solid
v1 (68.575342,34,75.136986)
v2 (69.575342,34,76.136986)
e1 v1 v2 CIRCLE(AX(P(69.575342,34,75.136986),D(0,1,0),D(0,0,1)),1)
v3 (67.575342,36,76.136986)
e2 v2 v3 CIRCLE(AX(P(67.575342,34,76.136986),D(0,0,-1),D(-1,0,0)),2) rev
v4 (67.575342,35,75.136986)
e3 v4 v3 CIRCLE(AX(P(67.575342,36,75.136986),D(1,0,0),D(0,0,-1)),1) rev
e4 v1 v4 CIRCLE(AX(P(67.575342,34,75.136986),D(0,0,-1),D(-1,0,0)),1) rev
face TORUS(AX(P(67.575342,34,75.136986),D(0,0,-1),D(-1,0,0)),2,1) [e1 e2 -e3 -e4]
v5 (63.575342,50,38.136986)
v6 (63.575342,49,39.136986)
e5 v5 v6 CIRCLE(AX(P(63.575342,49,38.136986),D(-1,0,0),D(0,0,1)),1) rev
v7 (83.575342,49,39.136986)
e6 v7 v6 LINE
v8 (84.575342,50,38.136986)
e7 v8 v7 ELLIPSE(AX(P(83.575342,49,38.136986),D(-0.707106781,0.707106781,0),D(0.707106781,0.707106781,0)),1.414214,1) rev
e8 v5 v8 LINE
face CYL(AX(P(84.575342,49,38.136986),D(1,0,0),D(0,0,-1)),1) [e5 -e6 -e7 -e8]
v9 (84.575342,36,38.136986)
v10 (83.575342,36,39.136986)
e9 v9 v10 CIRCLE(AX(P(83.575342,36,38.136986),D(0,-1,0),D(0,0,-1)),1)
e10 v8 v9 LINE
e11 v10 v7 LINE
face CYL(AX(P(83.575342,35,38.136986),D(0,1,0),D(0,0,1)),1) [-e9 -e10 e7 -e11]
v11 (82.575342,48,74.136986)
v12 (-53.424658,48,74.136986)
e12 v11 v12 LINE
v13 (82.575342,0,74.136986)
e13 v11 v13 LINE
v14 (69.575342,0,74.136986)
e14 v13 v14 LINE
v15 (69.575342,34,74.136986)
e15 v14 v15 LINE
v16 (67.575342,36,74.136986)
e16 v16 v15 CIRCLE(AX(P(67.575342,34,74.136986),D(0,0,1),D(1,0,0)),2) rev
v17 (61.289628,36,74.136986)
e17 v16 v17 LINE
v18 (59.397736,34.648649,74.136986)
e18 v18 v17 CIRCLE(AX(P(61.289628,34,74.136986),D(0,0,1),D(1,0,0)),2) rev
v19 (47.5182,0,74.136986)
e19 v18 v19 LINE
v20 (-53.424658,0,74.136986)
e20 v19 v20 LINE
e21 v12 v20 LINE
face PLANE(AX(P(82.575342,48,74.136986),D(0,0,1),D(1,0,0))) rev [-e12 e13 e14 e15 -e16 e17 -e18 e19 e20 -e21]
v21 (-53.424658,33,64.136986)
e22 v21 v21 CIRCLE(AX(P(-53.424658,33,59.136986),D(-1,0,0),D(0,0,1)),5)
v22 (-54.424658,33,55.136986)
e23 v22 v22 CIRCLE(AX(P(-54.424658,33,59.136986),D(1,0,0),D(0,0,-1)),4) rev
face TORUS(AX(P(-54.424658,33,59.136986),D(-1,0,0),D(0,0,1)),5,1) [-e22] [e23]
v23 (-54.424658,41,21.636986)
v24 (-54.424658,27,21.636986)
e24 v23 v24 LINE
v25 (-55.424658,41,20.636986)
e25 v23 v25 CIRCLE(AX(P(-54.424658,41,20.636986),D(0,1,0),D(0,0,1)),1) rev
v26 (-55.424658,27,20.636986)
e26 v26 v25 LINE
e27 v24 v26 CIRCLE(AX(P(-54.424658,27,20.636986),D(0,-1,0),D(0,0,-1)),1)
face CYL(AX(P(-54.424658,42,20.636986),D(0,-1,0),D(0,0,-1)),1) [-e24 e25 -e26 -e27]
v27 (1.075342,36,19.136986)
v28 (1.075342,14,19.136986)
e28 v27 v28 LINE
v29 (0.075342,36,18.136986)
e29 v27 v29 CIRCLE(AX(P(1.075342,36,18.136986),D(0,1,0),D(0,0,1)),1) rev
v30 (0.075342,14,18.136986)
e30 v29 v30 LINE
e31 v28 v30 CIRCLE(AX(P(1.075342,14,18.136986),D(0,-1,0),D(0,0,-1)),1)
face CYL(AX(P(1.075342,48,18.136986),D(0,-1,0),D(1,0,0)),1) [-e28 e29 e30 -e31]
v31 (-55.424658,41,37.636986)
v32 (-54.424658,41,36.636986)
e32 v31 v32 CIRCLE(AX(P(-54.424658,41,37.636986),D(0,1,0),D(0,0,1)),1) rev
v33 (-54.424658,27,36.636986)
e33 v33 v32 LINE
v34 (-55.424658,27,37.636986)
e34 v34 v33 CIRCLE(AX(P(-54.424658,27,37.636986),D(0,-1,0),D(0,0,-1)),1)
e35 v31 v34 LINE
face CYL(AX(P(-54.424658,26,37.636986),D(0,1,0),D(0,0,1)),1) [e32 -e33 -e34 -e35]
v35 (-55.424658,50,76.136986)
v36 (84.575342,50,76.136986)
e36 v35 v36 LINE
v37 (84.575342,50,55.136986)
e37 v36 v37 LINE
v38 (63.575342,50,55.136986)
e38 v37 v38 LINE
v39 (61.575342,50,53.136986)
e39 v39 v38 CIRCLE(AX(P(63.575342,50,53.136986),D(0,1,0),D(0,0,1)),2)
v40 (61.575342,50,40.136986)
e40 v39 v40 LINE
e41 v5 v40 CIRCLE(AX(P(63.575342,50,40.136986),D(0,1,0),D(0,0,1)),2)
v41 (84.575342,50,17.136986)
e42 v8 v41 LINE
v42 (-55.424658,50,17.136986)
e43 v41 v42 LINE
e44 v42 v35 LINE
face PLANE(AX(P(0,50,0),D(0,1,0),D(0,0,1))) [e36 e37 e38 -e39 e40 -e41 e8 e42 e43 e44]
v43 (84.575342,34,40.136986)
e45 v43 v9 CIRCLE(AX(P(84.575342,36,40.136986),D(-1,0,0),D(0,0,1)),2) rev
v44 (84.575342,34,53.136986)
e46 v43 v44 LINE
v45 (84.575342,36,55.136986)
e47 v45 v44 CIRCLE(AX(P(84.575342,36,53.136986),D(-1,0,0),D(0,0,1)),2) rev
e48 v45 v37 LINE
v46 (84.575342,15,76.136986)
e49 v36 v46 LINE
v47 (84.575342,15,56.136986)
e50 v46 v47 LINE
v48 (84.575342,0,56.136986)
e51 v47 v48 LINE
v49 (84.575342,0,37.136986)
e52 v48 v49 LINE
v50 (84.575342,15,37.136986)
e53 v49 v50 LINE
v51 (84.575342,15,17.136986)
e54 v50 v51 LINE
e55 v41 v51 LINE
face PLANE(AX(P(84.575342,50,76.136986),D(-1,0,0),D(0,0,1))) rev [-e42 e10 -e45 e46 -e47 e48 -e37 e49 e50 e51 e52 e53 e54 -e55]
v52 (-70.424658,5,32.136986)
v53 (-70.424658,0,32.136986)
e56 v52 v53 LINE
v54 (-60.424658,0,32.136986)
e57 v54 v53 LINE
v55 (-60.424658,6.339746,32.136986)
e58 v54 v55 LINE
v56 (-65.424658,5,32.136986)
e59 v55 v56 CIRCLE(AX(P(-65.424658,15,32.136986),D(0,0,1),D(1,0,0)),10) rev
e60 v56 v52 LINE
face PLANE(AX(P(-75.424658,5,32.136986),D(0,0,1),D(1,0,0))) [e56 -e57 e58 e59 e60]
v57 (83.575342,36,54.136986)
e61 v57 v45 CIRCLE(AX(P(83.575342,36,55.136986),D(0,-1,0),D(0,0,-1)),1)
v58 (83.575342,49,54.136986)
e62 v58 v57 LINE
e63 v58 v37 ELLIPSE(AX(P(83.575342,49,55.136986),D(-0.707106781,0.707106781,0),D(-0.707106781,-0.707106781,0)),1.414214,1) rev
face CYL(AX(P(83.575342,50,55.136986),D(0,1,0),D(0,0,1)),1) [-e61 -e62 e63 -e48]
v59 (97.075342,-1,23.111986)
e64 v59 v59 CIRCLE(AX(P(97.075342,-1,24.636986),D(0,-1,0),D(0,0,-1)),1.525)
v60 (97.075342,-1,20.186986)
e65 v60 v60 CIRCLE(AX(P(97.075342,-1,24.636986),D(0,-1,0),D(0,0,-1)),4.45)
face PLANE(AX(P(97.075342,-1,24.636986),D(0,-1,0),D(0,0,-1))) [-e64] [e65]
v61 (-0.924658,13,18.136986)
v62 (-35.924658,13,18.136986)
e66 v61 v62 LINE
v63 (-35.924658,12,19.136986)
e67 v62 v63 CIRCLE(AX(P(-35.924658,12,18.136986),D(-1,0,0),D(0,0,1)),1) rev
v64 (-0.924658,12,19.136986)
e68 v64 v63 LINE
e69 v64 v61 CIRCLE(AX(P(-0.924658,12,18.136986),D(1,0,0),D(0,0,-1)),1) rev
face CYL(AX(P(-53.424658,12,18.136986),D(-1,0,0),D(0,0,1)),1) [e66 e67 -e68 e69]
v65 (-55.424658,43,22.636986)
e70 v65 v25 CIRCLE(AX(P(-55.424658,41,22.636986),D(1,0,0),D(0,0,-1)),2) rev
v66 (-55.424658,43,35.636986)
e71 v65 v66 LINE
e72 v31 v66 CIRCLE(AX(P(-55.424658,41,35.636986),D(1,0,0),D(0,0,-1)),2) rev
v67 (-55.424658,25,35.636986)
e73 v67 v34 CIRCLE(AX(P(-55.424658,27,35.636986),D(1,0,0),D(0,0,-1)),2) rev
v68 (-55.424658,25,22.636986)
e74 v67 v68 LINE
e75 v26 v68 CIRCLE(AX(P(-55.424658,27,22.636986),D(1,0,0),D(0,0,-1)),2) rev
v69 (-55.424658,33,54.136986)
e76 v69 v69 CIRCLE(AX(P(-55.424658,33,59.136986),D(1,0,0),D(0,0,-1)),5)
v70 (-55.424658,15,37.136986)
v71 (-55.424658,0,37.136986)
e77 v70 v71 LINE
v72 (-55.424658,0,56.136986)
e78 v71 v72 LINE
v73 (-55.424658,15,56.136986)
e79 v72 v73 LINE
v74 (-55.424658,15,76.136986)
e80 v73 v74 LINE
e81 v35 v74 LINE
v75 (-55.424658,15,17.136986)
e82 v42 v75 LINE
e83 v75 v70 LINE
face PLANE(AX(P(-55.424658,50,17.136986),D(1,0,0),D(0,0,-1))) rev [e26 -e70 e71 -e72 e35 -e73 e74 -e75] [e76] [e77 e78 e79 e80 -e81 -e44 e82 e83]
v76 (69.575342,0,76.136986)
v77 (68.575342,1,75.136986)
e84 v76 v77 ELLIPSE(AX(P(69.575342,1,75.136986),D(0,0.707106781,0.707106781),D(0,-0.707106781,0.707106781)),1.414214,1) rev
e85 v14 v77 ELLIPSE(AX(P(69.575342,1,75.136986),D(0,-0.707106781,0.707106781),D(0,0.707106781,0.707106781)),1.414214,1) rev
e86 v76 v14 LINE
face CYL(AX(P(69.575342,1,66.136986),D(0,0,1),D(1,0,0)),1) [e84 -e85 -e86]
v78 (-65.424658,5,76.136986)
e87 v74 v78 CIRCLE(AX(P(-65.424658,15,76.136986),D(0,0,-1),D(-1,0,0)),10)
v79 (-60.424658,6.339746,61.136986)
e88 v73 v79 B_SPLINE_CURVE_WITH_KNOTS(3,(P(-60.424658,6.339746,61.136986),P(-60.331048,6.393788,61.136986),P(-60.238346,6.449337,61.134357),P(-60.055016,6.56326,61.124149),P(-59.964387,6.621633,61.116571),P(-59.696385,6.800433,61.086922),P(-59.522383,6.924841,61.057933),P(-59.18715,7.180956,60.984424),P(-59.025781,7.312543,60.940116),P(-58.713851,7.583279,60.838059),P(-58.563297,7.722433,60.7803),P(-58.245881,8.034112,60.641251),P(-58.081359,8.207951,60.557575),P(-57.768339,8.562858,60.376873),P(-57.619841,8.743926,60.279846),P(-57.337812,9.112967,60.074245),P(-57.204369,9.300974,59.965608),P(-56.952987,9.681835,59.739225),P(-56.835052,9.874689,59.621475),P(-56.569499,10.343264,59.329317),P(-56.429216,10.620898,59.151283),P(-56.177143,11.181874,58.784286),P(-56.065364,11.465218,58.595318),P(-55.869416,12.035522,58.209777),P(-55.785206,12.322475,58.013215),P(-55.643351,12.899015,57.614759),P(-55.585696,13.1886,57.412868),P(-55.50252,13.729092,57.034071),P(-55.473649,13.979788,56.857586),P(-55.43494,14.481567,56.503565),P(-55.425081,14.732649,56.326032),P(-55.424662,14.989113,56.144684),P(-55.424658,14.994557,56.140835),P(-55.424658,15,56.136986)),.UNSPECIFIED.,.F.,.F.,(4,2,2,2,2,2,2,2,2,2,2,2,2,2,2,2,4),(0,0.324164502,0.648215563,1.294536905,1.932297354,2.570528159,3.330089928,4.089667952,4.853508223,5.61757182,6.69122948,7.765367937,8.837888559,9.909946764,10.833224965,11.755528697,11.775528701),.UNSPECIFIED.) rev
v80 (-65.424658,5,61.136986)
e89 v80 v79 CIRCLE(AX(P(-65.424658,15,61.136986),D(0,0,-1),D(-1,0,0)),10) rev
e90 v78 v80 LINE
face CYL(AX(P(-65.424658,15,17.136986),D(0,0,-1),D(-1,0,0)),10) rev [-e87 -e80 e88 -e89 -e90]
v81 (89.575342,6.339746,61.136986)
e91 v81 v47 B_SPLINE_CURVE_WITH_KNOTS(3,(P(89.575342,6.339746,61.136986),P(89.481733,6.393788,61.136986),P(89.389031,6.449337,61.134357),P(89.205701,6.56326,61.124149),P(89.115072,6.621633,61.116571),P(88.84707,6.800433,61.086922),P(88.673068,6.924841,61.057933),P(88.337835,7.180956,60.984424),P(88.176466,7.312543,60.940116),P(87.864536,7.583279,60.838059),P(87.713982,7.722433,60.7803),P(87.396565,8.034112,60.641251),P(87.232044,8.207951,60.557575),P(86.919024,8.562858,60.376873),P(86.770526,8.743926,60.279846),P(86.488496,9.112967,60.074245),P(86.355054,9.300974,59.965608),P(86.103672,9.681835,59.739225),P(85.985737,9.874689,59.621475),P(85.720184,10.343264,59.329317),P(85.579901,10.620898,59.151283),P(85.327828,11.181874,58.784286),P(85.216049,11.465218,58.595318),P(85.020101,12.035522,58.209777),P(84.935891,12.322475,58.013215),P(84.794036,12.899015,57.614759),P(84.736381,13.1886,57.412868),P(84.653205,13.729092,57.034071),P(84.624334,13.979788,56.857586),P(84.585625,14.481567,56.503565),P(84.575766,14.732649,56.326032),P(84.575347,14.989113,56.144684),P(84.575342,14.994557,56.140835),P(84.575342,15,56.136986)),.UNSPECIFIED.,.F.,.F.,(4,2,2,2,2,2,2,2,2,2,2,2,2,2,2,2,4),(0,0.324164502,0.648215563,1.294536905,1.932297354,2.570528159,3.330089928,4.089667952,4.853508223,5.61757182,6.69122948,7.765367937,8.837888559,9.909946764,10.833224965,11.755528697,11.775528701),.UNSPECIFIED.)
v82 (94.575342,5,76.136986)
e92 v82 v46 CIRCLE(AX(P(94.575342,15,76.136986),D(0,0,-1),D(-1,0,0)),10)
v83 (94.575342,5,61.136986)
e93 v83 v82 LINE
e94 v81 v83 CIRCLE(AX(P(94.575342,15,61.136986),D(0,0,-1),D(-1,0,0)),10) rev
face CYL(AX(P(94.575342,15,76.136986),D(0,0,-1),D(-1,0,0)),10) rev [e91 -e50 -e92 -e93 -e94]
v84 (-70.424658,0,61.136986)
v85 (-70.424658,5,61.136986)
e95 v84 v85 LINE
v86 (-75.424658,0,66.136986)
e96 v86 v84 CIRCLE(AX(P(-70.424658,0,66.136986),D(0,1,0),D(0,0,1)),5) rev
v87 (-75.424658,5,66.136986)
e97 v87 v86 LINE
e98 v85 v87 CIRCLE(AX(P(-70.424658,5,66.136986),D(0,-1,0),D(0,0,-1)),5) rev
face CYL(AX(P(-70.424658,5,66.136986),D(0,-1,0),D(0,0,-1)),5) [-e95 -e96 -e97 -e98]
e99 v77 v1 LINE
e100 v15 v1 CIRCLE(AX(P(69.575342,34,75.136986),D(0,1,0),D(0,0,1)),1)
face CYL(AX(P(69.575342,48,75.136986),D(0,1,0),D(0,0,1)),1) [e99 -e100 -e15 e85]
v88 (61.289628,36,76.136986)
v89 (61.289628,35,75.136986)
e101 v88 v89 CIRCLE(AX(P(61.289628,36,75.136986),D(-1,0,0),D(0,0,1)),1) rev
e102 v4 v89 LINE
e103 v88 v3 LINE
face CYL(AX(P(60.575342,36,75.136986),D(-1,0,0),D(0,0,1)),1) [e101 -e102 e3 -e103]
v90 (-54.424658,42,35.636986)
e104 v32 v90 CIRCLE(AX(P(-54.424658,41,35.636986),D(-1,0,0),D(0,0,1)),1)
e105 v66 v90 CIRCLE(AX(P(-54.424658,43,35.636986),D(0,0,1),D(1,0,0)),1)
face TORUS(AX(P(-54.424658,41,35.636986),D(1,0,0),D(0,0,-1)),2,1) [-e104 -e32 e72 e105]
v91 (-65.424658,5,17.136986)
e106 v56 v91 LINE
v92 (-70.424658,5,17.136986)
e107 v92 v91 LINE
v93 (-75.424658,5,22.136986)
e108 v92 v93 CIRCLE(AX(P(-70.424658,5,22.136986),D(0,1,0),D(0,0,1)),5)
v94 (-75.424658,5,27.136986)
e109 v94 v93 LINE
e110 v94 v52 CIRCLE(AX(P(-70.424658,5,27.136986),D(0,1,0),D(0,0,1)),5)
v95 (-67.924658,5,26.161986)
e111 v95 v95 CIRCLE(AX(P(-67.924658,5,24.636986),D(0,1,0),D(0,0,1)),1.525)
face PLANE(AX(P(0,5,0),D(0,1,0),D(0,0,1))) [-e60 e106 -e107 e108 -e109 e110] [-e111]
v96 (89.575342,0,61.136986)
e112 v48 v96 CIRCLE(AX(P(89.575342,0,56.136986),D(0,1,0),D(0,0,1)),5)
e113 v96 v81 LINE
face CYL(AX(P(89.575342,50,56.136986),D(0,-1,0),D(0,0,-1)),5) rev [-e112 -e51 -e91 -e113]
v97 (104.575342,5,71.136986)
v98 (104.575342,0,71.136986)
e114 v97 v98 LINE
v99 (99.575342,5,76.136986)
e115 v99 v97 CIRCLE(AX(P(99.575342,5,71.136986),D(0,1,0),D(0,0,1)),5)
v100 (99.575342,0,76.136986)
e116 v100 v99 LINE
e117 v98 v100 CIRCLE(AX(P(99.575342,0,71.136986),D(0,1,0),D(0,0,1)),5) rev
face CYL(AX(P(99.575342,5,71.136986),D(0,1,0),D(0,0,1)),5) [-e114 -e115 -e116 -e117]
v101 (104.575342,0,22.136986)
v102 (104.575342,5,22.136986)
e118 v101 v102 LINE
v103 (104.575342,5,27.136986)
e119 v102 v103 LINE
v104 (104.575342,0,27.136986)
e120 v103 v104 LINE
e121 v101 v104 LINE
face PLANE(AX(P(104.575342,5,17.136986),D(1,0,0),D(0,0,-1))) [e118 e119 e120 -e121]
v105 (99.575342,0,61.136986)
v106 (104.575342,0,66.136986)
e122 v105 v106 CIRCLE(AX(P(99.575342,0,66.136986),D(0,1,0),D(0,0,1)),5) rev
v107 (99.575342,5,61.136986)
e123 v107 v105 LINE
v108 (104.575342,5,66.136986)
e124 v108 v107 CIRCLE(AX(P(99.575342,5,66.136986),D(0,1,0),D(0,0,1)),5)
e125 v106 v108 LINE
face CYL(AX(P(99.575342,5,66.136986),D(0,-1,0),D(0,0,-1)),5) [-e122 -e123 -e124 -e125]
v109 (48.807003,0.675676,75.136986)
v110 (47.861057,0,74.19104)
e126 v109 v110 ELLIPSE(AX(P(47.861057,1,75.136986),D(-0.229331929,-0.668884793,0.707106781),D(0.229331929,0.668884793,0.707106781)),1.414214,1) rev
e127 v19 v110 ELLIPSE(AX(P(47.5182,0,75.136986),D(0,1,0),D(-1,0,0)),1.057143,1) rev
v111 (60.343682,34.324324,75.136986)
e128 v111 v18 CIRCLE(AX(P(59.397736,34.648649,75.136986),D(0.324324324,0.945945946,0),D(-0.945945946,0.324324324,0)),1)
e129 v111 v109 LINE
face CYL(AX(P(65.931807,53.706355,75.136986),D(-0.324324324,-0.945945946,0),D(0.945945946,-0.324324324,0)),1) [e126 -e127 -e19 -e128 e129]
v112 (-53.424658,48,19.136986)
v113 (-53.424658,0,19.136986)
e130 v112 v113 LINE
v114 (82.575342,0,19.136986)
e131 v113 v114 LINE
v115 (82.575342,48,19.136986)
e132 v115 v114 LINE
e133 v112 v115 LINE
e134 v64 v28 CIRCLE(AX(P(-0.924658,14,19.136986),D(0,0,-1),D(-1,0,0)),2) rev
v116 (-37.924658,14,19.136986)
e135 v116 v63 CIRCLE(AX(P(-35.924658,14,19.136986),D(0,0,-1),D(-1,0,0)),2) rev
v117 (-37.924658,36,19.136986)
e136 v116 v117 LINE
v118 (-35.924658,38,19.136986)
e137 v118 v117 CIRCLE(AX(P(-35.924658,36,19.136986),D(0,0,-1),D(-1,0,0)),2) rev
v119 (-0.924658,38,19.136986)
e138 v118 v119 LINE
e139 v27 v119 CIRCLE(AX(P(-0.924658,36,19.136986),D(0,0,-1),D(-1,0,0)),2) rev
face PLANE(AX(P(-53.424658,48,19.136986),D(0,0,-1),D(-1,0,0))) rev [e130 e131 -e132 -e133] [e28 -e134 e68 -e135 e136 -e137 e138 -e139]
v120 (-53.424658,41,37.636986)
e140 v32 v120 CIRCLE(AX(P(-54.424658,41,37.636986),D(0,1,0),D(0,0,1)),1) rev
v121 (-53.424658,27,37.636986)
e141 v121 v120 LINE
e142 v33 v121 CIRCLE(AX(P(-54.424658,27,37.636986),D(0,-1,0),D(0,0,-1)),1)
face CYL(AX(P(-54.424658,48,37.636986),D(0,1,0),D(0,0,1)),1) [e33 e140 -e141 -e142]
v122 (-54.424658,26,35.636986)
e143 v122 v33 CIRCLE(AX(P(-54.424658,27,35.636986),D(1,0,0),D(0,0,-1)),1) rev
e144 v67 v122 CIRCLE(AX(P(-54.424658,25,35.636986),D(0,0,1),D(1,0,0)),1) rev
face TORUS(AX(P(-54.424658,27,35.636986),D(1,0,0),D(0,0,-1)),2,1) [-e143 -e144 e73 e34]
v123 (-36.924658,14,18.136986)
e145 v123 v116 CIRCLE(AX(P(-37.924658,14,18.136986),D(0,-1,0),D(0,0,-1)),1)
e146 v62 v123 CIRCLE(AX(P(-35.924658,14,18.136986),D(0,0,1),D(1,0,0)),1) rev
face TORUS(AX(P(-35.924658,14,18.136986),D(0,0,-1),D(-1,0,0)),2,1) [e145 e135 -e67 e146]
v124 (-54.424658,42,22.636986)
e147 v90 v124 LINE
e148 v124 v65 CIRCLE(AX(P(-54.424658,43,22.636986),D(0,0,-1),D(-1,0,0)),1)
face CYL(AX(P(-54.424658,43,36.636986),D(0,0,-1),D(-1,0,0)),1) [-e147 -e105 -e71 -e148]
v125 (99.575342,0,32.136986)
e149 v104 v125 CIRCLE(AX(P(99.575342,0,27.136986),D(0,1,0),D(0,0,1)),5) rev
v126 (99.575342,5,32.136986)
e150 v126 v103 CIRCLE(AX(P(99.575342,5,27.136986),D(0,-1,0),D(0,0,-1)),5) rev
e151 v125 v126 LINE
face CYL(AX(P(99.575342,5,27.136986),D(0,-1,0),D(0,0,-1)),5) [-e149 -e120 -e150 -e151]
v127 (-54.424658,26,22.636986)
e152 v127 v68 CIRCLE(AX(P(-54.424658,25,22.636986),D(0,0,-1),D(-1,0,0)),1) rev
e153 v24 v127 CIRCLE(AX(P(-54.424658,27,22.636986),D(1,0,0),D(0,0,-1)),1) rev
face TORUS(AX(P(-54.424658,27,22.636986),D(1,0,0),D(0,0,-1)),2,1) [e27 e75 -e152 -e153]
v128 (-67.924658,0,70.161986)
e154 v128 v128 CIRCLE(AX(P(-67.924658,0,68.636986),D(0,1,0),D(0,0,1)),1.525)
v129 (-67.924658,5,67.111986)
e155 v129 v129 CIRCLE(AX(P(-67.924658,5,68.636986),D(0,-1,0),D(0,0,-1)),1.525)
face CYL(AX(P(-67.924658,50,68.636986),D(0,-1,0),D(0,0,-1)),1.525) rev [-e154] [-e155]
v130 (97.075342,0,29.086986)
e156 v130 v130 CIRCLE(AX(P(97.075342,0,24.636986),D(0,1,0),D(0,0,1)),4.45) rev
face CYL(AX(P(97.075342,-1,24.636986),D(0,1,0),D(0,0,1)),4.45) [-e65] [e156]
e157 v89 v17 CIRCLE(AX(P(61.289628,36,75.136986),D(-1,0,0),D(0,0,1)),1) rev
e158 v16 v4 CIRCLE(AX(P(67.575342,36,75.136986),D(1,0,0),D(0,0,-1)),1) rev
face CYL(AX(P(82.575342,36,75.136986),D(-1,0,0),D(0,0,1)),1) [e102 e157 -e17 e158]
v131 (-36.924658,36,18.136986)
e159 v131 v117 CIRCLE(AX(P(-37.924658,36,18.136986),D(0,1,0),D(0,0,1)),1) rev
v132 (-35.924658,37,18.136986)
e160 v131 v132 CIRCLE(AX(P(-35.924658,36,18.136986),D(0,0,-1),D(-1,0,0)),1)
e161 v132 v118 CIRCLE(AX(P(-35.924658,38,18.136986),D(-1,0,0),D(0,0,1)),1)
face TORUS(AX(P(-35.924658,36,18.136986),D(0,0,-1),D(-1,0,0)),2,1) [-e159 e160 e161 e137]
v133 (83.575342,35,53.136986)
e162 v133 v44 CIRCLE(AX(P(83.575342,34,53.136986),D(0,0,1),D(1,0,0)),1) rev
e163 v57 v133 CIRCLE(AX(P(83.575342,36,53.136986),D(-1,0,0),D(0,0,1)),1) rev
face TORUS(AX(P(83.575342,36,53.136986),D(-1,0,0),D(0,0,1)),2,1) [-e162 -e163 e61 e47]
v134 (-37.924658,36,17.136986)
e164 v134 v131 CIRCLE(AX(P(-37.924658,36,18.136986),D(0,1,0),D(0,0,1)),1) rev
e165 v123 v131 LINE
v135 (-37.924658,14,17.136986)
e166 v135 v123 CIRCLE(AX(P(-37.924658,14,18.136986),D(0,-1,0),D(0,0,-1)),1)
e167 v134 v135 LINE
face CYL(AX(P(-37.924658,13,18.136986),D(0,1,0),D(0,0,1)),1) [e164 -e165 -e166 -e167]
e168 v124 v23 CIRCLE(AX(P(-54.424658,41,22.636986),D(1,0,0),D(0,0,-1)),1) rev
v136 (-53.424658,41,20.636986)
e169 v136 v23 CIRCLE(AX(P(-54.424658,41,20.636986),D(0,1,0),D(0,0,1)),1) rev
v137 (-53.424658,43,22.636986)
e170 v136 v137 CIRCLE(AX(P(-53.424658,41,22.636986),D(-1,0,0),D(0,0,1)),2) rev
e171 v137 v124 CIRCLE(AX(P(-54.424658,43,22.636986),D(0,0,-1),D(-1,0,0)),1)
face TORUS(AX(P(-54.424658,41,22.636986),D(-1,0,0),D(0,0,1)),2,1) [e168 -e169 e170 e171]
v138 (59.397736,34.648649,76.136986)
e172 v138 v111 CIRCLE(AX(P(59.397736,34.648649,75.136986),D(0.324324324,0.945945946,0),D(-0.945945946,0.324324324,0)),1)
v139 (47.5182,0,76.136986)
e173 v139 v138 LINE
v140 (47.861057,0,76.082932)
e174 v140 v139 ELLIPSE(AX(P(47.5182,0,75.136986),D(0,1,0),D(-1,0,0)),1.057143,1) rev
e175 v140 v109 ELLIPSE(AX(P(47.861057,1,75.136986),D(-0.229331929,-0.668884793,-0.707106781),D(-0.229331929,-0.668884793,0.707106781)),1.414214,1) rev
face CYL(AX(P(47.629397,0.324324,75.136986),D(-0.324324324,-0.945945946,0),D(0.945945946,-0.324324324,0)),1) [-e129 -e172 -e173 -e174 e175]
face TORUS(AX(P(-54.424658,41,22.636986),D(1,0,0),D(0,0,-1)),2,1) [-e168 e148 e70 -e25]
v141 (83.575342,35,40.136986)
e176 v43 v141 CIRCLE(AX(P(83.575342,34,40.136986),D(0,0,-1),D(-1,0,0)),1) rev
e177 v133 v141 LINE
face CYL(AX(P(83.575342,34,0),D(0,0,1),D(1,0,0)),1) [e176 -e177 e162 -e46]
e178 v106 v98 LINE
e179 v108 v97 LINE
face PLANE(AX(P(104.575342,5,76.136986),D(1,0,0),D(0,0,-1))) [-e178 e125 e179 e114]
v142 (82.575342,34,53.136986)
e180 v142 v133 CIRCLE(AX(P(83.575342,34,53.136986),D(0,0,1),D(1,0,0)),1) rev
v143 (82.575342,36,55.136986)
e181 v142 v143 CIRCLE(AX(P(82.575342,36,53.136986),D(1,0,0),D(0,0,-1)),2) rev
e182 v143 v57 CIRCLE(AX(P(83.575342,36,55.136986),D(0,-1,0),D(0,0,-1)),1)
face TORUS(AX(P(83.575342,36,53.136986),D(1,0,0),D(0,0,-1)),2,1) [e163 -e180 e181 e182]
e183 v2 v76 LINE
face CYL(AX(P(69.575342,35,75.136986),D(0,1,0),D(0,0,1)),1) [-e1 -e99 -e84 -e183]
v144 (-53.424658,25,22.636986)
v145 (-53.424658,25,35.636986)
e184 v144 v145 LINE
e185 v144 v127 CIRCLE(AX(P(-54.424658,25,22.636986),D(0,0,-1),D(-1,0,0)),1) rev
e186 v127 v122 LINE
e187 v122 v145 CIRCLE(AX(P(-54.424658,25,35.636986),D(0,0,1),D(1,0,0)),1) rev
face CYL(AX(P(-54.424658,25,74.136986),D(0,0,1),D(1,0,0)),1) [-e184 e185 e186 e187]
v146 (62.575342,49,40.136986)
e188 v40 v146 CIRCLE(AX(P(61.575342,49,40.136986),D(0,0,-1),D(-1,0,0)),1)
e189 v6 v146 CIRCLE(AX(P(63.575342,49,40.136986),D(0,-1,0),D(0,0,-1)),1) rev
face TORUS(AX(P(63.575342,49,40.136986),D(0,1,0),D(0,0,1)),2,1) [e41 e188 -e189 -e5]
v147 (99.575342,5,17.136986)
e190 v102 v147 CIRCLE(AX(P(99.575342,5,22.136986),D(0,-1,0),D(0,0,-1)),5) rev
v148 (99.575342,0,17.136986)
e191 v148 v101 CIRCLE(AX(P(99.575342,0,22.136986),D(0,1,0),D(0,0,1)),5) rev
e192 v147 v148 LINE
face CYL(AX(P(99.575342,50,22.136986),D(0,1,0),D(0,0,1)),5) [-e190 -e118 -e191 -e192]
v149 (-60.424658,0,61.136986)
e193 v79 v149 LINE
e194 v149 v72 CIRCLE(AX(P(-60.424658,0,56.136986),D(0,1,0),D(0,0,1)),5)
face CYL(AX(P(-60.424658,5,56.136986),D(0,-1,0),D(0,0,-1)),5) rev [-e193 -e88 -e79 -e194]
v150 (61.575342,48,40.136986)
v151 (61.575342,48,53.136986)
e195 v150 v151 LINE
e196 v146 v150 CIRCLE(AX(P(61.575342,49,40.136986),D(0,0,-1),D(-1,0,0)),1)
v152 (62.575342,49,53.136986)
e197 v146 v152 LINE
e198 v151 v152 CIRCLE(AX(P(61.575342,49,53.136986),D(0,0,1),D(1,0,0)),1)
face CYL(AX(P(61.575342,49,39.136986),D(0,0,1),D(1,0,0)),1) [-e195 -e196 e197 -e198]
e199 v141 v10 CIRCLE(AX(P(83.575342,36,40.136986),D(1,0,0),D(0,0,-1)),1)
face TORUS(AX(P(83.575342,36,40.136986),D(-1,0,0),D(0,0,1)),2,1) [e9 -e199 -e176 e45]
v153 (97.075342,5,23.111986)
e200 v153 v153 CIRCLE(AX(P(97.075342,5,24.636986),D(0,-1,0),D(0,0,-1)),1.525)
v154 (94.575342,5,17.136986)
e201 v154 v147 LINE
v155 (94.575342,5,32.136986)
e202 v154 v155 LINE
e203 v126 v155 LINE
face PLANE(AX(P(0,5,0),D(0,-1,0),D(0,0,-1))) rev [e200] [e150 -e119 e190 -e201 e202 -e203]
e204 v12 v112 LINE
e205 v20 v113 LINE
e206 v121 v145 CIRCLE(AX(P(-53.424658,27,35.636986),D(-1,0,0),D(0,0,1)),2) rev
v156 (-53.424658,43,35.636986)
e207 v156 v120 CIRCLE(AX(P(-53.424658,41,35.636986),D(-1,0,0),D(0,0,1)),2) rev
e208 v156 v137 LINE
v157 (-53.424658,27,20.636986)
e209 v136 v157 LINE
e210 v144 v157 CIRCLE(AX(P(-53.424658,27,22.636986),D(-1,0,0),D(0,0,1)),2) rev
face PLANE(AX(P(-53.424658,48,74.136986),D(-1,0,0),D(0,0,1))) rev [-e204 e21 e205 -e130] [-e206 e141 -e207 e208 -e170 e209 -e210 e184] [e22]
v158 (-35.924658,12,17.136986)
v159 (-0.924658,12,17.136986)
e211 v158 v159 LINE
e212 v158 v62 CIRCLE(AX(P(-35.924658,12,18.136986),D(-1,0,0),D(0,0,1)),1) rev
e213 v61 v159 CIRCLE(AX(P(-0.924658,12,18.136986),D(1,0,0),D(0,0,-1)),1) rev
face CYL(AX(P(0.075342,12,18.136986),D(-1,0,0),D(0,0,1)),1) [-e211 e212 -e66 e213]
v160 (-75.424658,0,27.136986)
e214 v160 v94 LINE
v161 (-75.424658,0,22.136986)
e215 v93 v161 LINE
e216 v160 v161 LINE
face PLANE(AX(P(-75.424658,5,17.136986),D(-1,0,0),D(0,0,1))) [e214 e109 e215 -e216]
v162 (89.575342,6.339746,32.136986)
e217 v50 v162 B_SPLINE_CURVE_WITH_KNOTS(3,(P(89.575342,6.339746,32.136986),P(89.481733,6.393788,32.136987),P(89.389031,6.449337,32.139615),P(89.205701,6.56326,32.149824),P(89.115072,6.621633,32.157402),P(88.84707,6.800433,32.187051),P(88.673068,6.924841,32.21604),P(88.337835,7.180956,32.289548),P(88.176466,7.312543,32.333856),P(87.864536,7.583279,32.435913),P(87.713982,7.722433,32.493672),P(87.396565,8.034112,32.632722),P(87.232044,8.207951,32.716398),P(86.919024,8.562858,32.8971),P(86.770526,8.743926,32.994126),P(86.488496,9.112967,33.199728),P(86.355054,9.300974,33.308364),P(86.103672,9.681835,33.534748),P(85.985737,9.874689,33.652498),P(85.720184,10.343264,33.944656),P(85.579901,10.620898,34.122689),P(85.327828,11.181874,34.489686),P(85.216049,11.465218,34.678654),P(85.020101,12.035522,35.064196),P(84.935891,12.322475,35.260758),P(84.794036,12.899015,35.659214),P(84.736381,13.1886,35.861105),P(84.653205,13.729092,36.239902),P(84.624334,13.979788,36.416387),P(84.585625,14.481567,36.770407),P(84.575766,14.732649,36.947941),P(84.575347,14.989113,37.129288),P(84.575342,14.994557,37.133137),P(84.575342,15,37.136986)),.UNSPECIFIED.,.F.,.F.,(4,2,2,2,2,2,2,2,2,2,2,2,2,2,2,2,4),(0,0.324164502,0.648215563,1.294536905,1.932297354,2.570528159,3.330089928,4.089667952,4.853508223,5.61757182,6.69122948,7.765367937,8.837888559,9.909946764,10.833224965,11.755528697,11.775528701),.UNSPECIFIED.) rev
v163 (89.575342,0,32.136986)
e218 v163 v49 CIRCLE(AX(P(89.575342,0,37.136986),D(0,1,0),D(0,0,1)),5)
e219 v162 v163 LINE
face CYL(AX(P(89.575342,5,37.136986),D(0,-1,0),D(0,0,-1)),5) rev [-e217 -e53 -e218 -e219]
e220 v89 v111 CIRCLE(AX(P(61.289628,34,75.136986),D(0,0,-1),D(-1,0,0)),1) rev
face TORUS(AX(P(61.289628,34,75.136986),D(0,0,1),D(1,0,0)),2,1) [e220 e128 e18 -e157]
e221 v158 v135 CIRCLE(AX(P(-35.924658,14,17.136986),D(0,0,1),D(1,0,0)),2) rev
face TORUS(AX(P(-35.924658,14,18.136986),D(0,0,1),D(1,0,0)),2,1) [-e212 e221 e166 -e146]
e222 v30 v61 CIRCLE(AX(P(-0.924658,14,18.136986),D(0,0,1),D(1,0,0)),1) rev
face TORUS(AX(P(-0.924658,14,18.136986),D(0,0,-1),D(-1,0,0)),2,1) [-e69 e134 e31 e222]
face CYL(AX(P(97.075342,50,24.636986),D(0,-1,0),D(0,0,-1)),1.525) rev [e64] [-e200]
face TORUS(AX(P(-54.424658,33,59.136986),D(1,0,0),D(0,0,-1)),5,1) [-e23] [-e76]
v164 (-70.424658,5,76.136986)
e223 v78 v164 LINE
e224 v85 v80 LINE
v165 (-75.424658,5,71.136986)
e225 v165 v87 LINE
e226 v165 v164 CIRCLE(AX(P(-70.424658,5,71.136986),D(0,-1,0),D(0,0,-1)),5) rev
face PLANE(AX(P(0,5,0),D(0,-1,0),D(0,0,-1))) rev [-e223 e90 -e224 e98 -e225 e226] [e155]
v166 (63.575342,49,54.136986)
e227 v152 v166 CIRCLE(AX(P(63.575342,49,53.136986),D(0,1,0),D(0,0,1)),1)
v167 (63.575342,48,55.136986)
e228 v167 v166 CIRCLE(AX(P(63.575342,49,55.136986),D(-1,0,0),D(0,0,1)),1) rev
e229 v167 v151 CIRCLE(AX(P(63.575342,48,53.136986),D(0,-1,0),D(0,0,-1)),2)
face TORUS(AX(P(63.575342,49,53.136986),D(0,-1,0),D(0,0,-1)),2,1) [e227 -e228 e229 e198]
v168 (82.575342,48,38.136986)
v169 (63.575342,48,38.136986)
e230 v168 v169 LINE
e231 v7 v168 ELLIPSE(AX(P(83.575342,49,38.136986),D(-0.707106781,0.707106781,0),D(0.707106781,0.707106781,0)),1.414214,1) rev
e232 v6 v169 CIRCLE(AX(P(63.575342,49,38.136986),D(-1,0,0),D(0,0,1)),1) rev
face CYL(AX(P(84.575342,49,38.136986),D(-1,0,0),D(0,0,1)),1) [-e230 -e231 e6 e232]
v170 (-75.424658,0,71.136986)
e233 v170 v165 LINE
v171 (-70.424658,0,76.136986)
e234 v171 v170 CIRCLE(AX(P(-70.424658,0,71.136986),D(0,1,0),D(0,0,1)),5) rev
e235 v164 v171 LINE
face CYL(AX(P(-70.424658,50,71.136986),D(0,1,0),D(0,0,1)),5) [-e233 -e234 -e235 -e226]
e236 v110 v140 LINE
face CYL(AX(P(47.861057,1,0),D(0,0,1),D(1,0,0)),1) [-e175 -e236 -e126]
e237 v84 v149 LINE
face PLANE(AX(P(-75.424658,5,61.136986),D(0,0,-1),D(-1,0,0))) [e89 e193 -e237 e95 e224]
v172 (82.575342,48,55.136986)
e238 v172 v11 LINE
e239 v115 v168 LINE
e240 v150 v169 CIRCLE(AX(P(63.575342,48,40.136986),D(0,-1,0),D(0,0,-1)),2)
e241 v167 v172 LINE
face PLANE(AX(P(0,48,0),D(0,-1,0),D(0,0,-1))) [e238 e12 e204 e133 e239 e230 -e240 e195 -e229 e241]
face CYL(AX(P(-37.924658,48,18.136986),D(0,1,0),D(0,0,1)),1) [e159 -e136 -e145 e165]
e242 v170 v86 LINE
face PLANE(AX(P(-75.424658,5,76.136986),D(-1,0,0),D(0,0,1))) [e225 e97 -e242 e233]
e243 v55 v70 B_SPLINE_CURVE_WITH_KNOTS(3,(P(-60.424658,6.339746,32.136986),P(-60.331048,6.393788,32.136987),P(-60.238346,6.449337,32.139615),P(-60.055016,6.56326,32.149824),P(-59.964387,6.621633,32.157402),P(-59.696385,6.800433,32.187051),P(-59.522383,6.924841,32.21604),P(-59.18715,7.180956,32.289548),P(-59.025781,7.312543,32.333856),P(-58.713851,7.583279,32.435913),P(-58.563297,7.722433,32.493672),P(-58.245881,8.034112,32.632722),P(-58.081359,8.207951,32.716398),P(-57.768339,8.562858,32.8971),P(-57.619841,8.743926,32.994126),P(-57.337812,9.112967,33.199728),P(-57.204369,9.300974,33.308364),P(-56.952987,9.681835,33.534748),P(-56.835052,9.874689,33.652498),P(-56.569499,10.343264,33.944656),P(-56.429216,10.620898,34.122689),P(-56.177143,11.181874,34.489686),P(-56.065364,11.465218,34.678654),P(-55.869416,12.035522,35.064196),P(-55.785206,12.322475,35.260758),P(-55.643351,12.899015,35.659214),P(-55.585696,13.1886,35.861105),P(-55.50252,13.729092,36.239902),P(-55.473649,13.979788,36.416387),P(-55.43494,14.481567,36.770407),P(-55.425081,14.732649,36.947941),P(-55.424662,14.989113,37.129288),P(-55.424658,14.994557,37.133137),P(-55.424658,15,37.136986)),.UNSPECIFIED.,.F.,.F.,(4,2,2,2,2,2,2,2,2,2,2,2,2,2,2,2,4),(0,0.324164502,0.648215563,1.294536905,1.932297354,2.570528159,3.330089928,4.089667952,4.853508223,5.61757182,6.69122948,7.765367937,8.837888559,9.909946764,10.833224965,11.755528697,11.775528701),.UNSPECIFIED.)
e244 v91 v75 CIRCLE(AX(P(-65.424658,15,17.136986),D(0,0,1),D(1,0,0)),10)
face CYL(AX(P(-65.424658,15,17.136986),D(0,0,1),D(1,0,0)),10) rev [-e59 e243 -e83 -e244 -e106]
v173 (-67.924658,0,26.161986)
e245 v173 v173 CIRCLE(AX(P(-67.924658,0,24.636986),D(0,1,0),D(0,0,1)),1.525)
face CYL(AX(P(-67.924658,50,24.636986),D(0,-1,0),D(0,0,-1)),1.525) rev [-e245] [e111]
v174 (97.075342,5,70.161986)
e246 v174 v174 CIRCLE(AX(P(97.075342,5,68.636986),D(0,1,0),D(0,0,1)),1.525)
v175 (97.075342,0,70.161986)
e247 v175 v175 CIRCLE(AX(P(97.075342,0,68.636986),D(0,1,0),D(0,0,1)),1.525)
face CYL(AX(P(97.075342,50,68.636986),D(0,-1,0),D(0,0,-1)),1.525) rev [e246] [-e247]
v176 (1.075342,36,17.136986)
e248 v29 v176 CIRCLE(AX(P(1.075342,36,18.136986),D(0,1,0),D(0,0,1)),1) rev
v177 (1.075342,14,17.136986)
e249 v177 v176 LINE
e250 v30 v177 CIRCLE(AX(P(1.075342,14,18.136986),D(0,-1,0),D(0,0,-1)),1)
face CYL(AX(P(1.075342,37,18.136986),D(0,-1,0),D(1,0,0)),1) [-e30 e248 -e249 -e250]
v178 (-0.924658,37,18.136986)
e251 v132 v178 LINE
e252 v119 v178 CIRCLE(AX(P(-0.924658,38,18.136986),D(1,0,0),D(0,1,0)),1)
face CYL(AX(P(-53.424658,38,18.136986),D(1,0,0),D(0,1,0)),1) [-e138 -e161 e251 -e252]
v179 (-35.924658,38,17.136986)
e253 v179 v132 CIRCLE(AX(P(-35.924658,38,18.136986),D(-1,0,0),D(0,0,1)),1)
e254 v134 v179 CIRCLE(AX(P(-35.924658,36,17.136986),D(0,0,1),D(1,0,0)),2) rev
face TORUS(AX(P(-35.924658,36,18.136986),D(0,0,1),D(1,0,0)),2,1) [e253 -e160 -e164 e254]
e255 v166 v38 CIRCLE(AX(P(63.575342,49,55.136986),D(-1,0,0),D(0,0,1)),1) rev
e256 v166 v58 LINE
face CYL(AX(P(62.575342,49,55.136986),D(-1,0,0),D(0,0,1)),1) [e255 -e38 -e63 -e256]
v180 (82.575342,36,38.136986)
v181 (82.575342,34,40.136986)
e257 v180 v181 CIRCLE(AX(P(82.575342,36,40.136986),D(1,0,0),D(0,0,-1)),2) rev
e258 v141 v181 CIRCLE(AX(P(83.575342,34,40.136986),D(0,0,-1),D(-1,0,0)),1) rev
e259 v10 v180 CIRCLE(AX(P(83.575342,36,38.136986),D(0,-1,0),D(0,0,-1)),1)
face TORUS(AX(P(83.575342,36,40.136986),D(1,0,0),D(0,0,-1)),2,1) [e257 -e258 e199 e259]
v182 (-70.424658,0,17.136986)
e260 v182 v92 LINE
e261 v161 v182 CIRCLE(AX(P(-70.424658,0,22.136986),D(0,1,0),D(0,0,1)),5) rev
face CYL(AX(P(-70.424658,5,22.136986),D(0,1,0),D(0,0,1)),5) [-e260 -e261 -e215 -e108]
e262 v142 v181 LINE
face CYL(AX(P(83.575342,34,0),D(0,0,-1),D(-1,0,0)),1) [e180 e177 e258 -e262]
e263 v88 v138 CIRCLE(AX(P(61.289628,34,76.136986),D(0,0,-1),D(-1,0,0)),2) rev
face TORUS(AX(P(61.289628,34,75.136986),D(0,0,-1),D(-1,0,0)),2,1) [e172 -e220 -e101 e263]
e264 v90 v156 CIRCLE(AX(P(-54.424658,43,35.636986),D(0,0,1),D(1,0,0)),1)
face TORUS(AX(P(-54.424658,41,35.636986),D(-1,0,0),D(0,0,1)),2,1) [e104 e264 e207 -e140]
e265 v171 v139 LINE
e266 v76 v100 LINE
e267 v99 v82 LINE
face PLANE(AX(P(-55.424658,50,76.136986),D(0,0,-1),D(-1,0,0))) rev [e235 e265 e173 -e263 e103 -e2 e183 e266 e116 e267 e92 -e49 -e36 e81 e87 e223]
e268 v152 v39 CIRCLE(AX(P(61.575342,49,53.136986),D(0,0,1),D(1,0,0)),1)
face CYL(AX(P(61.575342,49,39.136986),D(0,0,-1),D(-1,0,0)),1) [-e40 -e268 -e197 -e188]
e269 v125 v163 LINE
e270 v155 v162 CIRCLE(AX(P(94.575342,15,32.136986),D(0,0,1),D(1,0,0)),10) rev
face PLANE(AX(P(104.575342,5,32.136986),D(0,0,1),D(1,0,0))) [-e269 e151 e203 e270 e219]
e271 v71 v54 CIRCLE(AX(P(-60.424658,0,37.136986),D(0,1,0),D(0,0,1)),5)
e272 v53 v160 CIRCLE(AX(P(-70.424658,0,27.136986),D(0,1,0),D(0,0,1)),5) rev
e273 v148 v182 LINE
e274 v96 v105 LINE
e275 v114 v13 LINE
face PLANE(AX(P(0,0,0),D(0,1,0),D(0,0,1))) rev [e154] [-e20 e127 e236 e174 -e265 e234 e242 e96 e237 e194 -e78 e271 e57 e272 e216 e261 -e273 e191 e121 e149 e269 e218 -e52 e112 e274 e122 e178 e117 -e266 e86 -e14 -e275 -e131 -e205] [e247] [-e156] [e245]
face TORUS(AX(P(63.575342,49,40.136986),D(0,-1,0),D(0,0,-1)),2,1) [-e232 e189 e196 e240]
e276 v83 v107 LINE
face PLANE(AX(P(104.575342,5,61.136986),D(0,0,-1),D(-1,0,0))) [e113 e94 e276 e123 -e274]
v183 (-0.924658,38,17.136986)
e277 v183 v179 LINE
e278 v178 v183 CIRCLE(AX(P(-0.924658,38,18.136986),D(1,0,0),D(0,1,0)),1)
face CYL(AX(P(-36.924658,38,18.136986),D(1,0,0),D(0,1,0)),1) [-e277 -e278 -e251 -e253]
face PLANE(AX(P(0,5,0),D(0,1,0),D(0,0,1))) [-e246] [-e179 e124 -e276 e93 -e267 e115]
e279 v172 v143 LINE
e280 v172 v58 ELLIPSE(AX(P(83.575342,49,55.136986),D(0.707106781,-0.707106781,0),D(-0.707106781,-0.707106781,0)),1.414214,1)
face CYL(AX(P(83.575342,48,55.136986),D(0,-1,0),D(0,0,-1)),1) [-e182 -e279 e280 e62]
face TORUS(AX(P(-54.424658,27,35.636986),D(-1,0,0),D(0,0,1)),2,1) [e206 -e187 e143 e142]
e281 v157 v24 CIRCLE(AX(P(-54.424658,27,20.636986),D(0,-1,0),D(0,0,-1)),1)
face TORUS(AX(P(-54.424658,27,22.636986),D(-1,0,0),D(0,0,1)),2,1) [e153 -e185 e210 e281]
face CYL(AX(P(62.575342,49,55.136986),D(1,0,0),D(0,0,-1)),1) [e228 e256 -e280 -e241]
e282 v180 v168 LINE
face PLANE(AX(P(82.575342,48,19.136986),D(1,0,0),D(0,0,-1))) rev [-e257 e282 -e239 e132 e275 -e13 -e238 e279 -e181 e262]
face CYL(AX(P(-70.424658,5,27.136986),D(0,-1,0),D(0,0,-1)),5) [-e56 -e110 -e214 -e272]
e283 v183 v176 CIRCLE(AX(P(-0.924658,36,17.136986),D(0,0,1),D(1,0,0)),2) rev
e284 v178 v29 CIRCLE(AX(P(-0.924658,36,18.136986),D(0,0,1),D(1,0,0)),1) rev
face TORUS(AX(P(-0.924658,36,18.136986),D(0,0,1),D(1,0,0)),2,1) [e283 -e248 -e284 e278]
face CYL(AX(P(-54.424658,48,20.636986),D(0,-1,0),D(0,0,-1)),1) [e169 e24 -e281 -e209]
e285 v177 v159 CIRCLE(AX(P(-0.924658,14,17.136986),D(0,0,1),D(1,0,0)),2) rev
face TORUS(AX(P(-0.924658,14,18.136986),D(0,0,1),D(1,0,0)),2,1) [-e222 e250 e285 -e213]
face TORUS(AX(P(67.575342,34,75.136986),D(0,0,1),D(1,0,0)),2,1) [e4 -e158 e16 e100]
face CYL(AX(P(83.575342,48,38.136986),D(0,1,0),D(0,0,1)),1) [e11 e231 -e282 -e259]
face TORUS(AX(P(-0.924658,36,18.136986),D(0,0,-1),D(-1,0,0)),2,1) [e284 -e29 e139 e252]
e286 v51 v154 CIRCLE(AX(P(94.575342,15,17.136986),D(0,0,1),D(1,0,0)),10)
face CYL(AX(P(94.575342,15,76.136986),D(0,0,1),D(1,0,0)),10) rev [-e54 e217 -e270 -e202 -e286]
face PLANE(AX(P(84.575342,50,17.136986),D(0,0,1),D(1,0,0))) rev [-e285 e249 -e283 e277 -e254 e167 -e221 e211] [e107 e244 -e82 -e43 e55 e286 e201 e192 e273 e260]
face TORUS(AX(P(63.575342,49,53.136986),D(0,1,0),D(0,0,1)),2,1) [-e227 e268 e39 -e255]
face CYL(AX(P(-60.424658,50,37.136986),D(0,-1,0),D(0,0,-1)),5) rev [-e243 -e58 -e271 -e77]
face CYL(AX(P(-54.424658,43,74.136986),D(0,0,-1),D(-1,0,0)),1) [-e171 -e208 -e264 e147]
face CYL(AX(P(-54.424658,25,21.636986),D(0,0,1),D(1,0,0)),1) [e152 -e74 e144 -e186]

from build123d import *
from OCP.BRepFilletAPI import BRepFilletAPI_MakeFillet

# Parameters (mm, degrees)
SKETCH1_W               = 140
SKETCH1_H               = 59
BOSS_EXTRUDE1_DEPTH     = 50
SKETCH2_W               = 136
SKETCH2_H               = 55
CUT_EXTRUDE1_DEPTH      = 48
SKETCH3_W               = 20
SKETCH3_H               = 15
BOSS_EXTRUDE2_DEPTH     = 5
FILLET1_R1              = 5
FILLET1_R2              = 10
SKETCH4_5_R             = 4.45
BOSS_EXTRUDE3_DEPTH     = 1
CUT_EXTRUDE4_DEPTH      = 139.682525756
CUT_EXTRUDE4_DEPTH_BACK = 139.682525756
SKETCH4_R               = 1.525
SKETCH5_W               = 22
SKETCH5_H               = 15
ANTENNAHOLE_DEPTH       = 15
SKETCH6_R               = 4
SKETCH6_W               = 15
SKETCH6_H               = 16
CUT_EXTRUDE5_DEPTH      = 10
SKETCH7_W               = 37
SKETCH7_H               = 24
CUT_EXTRUDE6_DEPTH      = 10
CUT_EXTRUDE7_DEPTH      = 10
FILLET2_R               = 1


with BuildPart() as part:
    # Sketch1 → Boss-Extrude1 (new body)
    with BuildSketch(Plane(origin=(0, 0, 0), x_dir=(1, 0, 0), z_dir=(0, 1, 0))):
        with Locations((14.575342466, -46.636986301)):
            Rectangle(SKETCH1_W, SKETCH1_H)
    extrude(amount=BOSS_EXTRUDE1_DEPTH)

    # Sketch2 → Cut-Extrude1 (cut)
    with BuildSketch(Plane.XZ):
        with Locations((14.575342466, 46.636986301)):
            Rectangle(SKETCH2_W, SKETCH2_H)
    extrude(amount=-CUT_EXTRUDE1_DEPTH, mode=Mode.SUBTRACT)

    # Sketch3 → Boss-Extrude2 (add)
    with BuildSketch(Plane.XZ):
        with Locations((-65.424657534, 68.636986301)):
            Rectangle(SKETCH3_W, SKETCH3_H)
        with Locations((-65.424657534, 24.636986301)):
            Rectangle(SKETCH3_W, SKETCH3_H)
        with Locations((94.575342466, 24.636986301)):
            Rectangle(SKETCH3_W, SKETCH3_H)
        with Locations((94.575342466, 68.636986301)):
            Rectangle(SKETCH3_W, SKETCH3_H)
    extrude(amount=-BOSS_EXTRUDE2_DEPTH)

    # Fillet1: one fillet with a radius per group of edges: ONE call of the kernel's fillet builder (fillet() takes one radius for all edges)
    fillet1_edges_1 = [part.edges().sort_by_distance(p)[0] for p in [
        (84.575342466, 2.5, 61.136986301),
        (104.575342466, 2.5, 61.136986301),
        (104.575342466, 2.5, 32.136986301),
        (104.575342466, 2.5, 17.136986301),
        (104.575342466, 2.5, 76.136986301),
        (-55.424657534, 2.5, 61.136986301),
        (-75.424657534, 2.5, 61.136986301),
        (-75.424657534, 2.5, 76.136986301),
        (-75.424657534, 2.5, 32.136986301),
        (-55.424657534, 2.5, 32.136986301),
        (-75.424657534, 2.5, 17.136986301),
        (84.575342466, 2.5, 32.136986301),
    ]]
    fillet1_edges_2 = [part.edges().sort_by_distance(p)[0] for p in [
        (84.575342466, 5, 68.636986301),
        (84.575342466, 5, 24.636986301),
        (-55.424657534, 5, 68.636986301),
        (-55.424657534, 5, 24.636986301),
    ]]
    fillet1 = BRepFilletAPI_MakeFillet(part.part.solid().wrapped)
    for e in fillet1_edges_1:
        fillet1.Add(FILLET1_R1, e.wrapped)
    for e in fillet1_edges_2:
        fillet1.Add(FILLET1_R2, e.wrapped)
    add(Compound.cast(fillet1.Shape()), mode=Mode.REPLACE)

    # Sketch4<5> → Boss-Extrude3 (add)
    with BuildSketch(Plane(origin=(0, 0, 0), x_dir=(-1, 0, 0), z_dir=(0, -1, 0))):
        with Locations(Location((-97.075342466, -24.636986301, 0), (0, 0, 270))):
            Circle(SKETCH4_5_R)
    extrude(amount=BOSS_EXTRUDE3_DEPTH)

    # Sketch4 → Cut-Extrude4 (cut, two sides: drawn at the far end of the back side and taken through both)
    with BuildSketch(Plane(origin=(0, 0, 0), x_dir=(-1, 0, 0), z_dir=(0, -1, 0)).offset(-CUT_EXTRUDE4_DEPTH_BACK)):
        with Locations(Location((-97.075342466, -24.636986301, 0), (0, 0, 90))):
            Circle(SKETCH4_R)
        with Locations(Location((-97.075342466, -68.636986301, 0), (0, 0, 270))):
            Circle(SKETCH4_R)
        with Locations(Location((67.924657534, -68.636986301, 0), (0, 0, 90))):
            Circle(SKETCH4_R)
        with Locations(Location((67.924657534, -24.636986301, 0), (0, 0, 270))):
            Circle(SKETCH4_R)
    extrude(amount=CUT_EXTRUDE4_DEPTH + CUT_EXTRUDE4_DEPTH_BACK, mode=Mode.SUBTRACT)

    # Sketch5 → AntennaHole (cut)
    with BuildSketch(Plane(origin=(0, 50, 0), x_dir=(1, 0, 0), z_dir=(0, 1, 0))):
        with Locations((73.575342466, -46.636986301)):
            Rectangle(SKETCH5_W, SKETCH5_H)
    extrude(amount=-ANTENNAHOLE_DEPTH, mode=Mode.SUBTRACT)

    # Sketch6 → Cut-Extrude5 (cut)
    with BuildSketch(Plane.ZY.offset(55.424657534)):
        with Locations((59.136986301, 33)):
            Circle(SKETCH6_R)
        with Locations((29.136986301, 34)):
            Rectangle(SKETCH6_W, SKETCH6_H)
    extrude(amount=-CUT_EXTRUDE5_DEPTH, mode=Mode.SUBTRACT)

    # Sketch7 → Cut-Extrude6 (cut)
    with BuildSketch(Plane(origin=(0, 0, 17.136986301), x_dir=(-1, 0, 0), z_dir=(0, 0, -1))):
        with Locations((18.424657534, 25)):
            Rectangle(SKETCH7_W, SKETCH7_H)
    extrude(amount=-CUT_EXTRUDE6_DEPTH, mode=Mode.SUBTRACT)

    # Sketch8 → Cut-Extrude7 (cut)
    with BuildSketch(Plane.XY.offset(76.136986301)):
        Polygon((68.575342466, 35), (68.575342466, 0), (48.575342466, 0), (60.575342466, 35), align=None)
    extrude(amount=-CUT_EXTRUDE7_DEPTH, mode=Mode.SUBTRACT)

    # Fillet2
    fillet2_edges = [part.edges().sort_by_distance(p)[0] for p in [
        (72.575342466, 48, 39.136986301),
        (62.575342466, 48, 46.636986301),
        (72.575342466, 48, 54.136986301),
        (82.575342466, 35, 46.636986301),
        (82.575342466, 41.5, 54.136986301),
        (83.575342466, 35, 54.136986301),
        (84.575342466, 42.5, 54.136986301),
        (83.575342466, 35, 39.136986301),
        (82.575342466, 41.5, 39.136986301),
        (62.575342466, 49, 39.136986301),
        (62.575342466, 49, 54.136986301),
        (84.575342466, 35, 46.636986301),
        (84.575342466, 42.5, 39.136986301),
        (73.575342466, 50, 54.136986301),
        (73.575342466, 50, 39.136986301),
        (62.575342466, 50, 46.636986301),
        (-53.424657534, 34, 21.636986301),
        (-53.424657534, 26, 29.136986301),
        (-53.424657534, 34, 36.636986301),
        (-53.424657534, 42, 29.136986301),
        (-54.424657534, 42, 21.636986301),
        (-54.424657534, 42, 36.636986301),
        (-54.424657534, 26, 36.636986301),
        (-54.424657534, 26, 21.636986301),
        (-55.424657534, 42, 29.136986301),
        (-55.424657534, 34, 21.636986301),
        (-55.424657534, 26, 29.136986301),
        (-55.424657534, 34, 36.636986301),
        (-53.424657534, 33, 55.136986301),
        (-55.424657534, 33, 55.136986301),
        (0.075342466, 25, 19.136986301),
        (-18.424657534, 13, 19.136986301),
        (-36.924657534, 25, 19.136986301),
        (-18.424657534, 37, 19.136986301),
        (0.075342466, 37, 18.136986301),
        (-36.924657534, 37, 18.136986301),
        (-36.924657534, 13, 18.136986301),
        (0.075342466, 13, 18.136986301),
        (-18.424657534, 37, 17.136986301),
        (0.075342466, 25, 17.136986301),
        (-18.424657534, 13, 17.136986301),
        (-36.924657534, 25, 17.136986301),
        (54.575342466, 17.5, 74.136986301),
        (64.575342466, 35, 74.136986301),
        (68.575342466, 17.5, 74.136986301),
        (60.575342466, 35, 75.136986301),
        (68.575342466, 35, 75.136986301),
        (68.575342466, 0, 75.136986301),
        (48.575342466, 0, 75.136986301),
        (64.575342466, 35, 76.136986301),
        (54.575342466, 17.5, 76.136986301),
        (68.575342466, 17.5, 76.136986301),
    ]]
    fillet(fillet2_edges, radius=FILLET2_R - 0.0001)  # a hair under: the kernel refuses the full size


solid = part.part
